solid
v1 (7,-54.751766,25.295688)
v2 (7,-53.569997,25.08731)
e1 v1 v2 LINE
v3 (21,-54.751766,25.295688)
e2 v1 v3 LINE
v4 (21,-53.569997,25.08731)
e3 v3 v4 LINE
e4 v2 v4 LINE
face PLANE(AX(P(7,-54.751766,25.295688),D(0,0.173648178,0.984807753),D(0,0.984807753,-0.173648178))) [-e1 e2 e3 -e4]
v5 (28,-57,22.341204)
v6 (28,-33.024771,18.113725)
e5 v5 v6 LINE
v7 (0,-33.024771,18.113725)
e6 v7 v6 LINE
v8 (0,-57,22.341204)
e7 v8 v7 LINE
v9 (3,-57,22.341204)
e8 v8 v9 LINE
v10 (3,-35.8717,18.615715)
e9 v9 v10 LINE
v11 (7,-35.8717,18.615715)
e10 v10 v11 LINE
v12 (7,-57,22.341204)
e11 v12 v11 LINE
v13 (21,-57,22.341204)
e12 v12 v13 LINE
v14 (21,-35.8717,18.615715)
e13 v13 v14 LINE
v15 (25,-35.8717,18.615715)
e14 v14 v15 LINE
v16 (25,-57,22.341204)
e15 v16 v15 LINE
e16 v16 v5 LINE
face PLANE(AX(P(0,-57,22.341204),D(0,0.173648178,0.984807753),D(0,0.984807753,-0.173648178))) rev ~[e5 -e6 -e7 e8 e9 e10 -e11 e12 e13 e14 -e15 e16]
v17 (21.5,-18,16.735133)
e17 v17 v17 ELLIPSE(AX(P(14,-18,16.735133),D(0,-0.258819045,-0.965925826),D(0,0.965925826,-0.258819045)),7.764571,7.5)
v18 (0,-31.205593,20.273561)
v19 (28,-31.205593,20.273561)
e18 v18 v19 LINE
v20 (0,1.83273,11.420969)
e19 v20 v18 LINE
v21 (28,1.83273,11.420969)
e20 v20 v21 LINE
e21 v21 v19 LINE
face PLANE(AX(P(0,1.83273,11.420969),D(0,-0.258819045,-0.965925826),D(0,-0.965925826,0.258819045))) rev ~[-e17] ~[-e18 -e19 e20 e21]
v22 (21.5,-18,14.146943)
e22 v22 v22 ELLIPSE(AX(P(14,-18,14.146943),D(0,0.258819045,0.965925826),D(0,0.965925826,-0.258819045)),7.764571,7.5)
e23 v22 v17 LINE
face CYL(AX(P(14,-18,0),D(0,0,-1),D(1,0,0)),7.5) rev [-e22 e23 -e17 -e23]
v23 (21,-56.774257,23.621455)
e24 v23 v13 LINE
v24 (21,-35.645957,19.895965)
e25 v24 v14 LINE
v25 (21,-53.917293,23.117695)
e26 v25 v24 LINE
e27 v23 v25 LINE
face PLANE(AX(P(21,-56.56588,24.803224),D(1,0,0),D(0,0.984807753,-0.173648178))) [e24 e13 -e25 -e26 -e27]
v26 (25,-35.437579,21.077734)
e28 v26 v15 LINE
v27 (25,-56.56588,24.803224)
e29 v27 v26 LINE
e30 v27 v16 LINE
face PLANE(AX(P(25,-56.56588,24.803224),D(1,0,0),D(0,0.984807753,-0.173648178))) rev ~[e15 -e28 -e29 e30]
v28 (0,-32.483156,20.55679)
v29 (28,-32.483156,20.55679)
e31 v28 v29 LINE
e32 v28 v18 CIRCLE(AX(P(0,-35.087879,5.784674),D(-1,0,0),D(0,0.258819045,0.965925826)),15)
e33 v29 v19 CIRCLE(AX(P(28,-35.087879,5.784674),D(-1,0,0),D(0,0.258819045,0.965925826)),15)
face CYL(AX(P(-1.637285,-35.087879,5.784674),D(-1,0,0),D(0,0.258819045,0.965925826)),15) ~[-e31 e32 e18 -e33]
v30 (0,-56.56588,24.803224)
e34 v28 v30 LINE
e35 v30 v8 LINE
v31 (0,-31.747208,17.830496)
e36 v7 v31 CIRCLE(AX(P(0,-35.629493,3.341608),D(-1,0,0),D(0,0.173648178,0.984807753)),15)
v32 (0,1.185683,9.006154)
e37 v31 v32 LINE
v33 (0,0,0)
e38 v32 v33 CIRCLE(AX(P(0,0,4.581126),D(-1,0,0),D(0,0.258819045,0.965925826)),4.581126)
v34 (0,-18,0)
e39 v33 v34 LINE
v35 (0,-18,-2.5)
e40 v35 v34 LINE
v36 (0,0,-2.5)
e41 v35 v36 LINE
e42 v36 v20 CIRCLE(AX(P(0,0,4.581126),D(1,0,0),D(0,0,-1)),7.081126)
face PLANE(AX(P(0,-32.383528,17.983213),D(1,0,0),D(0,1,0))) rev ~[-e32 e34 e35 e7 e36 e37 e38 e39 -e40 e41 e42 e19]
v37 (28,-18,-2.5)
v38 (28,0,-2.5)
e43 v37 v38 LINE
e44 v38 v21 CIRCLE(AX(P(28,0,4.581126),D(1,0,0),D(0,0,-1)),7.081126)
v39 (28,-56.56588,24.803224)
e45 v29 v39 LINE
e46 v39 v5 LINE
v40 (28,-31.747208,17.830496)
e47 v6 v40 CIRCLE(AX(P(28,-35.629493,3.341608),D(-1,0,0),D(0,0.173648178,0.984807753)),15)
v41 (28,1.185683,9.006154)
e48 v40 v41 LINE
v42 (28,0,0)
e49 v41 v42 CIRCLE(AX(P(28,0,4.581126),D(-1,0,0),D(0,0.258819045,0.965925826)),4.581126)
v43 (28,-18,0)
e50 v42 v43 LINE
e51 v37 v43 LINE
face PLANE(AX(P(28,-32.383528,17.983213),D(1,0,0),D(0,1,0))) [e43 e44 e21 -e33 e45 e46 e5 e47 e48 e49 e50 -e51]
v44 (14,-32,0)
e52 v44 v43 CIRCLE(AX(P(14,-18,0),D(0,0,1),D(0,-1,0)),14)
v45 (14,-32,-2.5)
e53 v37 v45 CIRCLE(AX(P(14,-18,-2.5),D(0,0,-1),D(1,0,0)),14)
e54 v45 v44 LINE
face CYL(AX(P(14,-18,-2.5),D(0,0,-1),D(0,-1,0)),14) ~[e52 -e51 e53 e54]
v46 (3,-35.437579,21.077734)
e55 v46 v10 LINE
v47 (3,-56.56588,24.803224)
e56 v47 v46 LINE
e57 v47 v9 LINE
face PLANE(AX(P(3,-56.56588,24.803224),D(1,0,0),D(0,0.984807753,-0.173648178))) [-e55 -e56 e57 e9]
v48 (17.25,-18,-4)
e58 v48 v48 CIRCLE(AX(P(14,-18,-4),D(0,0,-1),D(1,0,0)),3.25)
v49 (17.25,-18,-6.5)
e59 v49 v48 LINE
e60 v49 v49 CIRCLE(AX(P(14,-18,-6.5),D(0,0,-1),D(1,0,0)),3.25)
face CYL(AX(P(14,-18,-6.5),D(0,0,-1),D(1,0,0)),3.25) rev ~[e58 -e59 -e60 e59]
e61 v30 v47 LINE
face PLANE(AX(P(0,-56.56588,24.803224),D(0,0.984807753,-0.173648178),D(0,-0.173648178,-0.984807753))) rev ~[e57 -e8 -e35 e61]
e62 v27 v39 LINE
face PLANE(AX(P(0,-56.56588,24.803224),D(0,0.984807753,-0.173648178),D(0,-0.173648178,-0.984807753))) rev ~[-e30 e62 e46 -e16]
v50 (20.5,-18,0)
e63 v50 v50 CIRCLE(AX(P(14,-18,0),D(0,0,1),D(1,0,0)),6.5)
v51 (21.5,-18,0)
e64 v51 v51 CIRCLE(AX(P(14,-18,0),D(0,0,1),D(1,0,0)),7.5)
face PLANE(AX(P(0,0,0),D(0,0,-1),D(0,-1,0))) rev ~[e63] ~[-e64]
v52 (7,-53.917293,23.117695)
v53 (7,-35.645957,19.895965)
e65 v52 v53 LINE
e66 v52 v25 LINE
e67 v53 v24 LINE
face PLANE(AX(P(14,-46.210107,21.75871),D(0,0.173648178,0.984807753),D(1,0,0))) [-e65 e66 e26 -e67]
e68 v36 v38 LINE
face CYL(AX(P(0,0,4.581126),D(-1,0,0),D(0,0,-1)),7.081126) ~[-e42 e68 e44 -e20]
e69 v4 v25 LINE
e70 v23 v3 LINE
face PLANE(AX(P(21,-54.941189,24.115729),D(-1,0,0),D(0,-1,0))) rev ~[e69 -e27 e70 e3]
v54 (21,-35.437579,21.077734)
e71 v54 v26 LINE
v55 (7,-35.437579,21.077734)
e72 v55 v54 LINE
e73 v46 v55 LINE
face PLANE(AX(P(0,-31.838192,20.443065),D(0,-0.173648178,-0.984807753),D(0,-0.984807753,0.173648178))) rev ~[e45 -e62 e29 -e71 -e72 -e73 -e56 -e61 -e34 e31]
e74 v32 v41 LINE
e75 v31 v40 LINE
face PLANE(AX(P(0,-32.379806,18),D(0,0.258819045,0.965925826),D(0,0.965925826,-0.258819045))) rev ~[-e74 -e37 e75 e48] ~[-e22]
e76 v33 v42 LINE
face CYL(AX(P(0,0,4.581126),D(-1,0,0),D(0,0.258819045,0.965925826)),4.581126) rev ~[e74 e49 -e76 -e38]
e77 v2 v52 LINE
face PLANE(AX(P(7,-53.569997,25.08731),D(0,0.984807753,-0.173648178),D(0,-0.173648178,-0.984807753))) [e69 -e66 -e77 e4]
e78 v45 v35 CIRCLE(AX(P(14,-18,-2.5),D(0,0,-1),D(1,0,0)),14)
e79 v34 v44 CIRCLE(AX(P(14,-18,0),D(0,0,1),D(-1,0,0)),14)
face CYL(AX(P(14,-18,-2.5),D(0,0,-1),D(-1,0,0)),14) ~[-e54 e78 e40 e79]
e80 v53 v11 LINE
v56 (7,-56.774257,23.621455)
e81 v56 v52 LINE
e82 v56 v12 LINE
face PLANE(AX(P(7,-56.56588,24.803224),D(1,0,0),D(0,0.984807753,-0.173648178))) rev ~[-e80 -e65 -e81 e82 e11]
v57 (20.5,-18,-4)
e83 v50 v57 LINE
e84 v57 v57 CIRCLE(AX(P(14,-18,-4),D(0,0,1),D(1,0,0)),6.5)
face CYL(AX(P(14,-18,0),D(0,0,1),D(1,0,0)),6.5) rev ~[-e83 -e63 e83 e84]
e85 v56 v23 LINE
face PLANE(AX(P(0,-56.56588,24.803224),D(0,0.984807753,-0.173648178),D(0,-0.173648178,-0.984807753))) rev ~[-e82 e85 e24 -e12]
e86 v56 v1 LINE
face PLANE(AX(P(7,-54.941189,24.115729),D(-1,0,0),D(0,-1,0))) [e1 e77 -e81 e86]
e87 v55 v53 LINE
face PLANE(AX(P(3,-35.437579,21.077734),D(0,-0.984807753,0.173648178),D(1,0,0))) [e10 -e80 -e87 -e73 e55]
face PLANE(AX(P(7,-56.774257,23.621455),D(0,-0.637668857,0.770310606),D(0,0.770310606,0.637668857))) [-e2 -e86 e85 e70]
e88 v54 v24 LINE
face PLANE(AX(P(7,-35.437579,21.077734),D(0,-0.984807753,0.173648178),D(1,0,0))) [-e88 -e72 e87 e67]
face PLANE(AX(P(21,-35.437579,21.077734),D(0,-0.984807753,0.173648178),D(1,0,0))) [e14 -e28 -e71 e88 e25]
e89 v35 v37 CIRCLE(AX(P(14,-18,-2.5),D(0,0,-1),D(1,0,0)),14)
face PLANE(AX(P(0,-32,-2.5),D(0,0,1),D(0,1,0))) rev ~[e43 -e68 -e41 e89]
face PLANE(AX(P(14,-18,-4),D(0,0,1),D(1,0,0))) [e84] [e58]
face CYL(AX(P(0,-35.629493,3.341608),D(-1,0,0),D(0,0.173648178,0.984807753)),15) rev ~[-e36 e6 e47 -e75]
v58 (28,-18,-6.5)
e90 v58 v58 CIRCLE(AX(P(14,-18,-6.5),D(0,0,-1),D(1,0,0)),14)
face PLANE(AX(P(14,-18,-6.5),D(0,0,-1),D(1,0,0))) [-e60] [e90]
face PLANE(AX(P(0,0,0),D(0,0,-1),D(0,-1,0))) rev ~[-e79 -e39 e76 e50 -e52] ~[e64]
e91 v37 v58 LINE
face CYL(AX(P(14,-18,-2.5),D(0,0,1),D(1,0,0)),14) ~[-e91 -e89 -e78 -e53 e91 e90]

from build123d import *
from build123d import SkipClean  # not in build123d's __all__

# Parameters (mm, degrees)
F1_DEPTH    = 28
F2_T1_DEPTH = 28
F2_T3_DEPTH = 31.2745707181
F3_R        = 14
F4_DEPTH    = 4
F6_DEPTH    = 2.5
F7_R        = 3.25
F8_DEPTH    = 31.3042238242
F9_R        = 7.5
F10_DEPTH   = 24.8042238242
F11_R       = 6.5
F12_DEPTH   = 4
F13_W       = 4
F13_H       = 21.4542382136
F14_DEPTH   = 2.5
F15_W       = 14
F15_H       = 21.4542382136
F16_DEPTH   = 1.2
F18_DEPTH   = 14


# Not quite as in the source:
# - a fillet or chamfer that OpenCascade refuses, or shapes differently, is made with other operations: its cross-section is extruded or revolved along the edge and cut away or added


with BuildPart() as f1:
    # F0 (on Right) → F1 (new body)
    with BuildSketch(Plane.YZ):
        with BuildLine():
            Line((0, 0), (-32, 0))
            Line((-32, 0), (-32, -2.5))
            Line((-32, -2.5), (0, -2.5))
            ThreePointArc((0, -2.5), (7.0205462081, 3.6568537819), (1.8327303277, 11.4209689242))
            Line((1.8327303277, 11.4209689242), (-31.8381916428, 20.4430652746))
            Line((-31.8381916428, 20.4430652746), (-56.5658795558, 24.8032238242))
            Line((-56.5658795558, 24.8032238242), (-57, 22.3412044417))
            Line((-57, 22.3412044417), (-32.3798061747, 18))
            Line((-32.3798061747, 18), (1.1856827149, 9.0061543585))
            ThreePointArc((1.1856827149, 9.0061543585), (4.5419340547, 3.9831692624), (0, 0))
        make_face()
    extrude(amount=F1_DEPTH)

    # F2: fillet of radius 15 on 2 edges, made by hand

    # F2_s2 → F2_t1 (join)
    with BuildSketch(Plane.YZ):
        with BuildLine():
            ThreePointArc((-33.0247707009, 18.1137246476), (-32.3828991568, 17.9860484592), (-31.7472076894, 17.8304957467))
            Line((-31.7472076894, 17.8304957467), (-32.3798061747, 18))
            Line((-32.3798061747, 18), (-33.0247707009, 18.1137246476))
        make_face()
    extrude(amount=F2_T1_DEPTH)

    # F2_s4 → F2_t3 (cut)
    with BuildSketch(Plane.YZ.offset(-1.6372853591)):
        with BuildLine():
            ThreePointArc((-31.2055931575, 20.2735610213), (-31.841284625, 20.4291137338), (-32.483156169, 20.5567899222))
            Line((-32.483156169, 20.5567899222), (-31.8381916428, 20.4430652746))
            Line((-31.8381916428, 20.4430652746), (-31.2055931575, 20.2735610213))
        make_face()
    extrude(amount=F2_T3_DEPTH, mode=Mode.SUBTRACT)

    # F3 (on face) → F4 (join)
    with BuildSketch(Plane(origin=(0, 0, -2.5), x_dir=(1, 0, 0), z_dir=(0, 0, -1))):
        with Locations((14, 18)):
            Circle(F3_R)
    extrude(amount=F4_DEPTH)

    # F5 (on face) → F6 (cut, through all)
    with BuildSketch(Plane(origin=(0, 0, -2.5), x_dir=(1, 0, 0), z_dir=(0, 0, -1))):
        with BuildLine():
            ThreePointArc((0, 18), (4.1005050634, 27.8994949366), (14, 32))
            Line((14, 32), (0, 32))
            Line((0, 32), (0, 18))
        make_face()
        with BuildLine():
            Line((28, 18), (28, 32))
            Line((28, 32), (14, 32))
            ThreePointArc((14, 32), (23.8994949366, 27.8994949366), (28, 18))
        make_face()
    with SkipClean():  # cleaning this boolean's faces spoils the solid; the shape is the same uncleaned
        extrude(amount=-F6_DEPTH, mode=Mode.SUBTRACT)

    # F7 (on face) → F8 (cut, through all)
    with BuildSketch(Plane(origin=(0, 0, -6.5), x_dir=(1, 0, 0), z_dir=(0, 0, -1))):
        with Locations((14, 18)):
            Circle(F7_R)
    with SkipClean():  # cleaning this boolean's faces spoils the solid; the shape is the same uncleaned
        extrude(amount=-F8_DEPTH, mode=Mode.SUBTRACT)

    # F9 (on face) → F10 (cut, through all)
    with BuildSketch(Plane.XY):
        with Locations((14, -18)):
            Circle(F9_R)
    with SkipClean():  # cleaning this boolean's faces spoils the solid; the shape is the same uncleaned
        extrude(amount=F10_DEPTH, mode=Mode.SUBTRACT)

    # F11 (on face) → F12 (cut)
    with BuildSketch(Plane.XY):
        with Locations((14, -18)):
            Circle(F11_R)
    with SkipClean():  # cleaning this boolean's faces spoils the solid; the shape is the same uncleaned
        extrude(amount=-F12_DEPTH, mode=Mode.SUBTRACT)

    # F13 (on face) → F14 (cut, through all)
    with BuildSketch(Plane(origin=(0, 2.5359311092, 14.3819799952), x_dir=(1, 0, 0), z_dir=(0, 0.1736481777, 0.984807753))):
        with Locations((23, -49.2864322531)):
            Rectangle(F13_W, F13_H)
        with Locations((5, -49.2864322531)):
            Rectangle(F13_W, F13_H)
    with SkipClean():  # cleaning this boolean's faces spoils the solid; the shape is the same uncleaned
        extrude(amount=-F14_DEPTH, mode=Mode.SUBTRACT)

    # F15 (on face) → F16 (cut)
    with BuildSketch(Plane(origin=(0, 2.5359311092, 14.3819799952), x_dir=(1, 0, 0), z_dir=(0, 0.1736481777, 0.984807753))):
        with Locations((14, -49.2864322531)):
            Rectangle(F15_W, F15_H)
    with SkipClean():  # cleaning this boolean's faces spoils the solid; the shape is the same uncleaned
        extrude(amount=-F16_DEPTH, mode=Mode.SUBTRACT)

    # F17 (on face) → F18 (join, through all)
    with BuildSketch(Plane(origin=(7, 0, 0), x_dir=(0, -1, 0), z_dir=(-1, 0, 0))):
        Polygon((53.5699966888, 25.0873101332), (53.9172930442, 23.1176946272), (56.774257369, 23.6214545206), (54.7517659925, 25.2956879464), align=None)
    with SkipClean():  # cleaning this boolean's faces spoils the solid; the shape is the same uncleaned
        extrude(amount=-F18_DEPTH)


solid = f1.part
